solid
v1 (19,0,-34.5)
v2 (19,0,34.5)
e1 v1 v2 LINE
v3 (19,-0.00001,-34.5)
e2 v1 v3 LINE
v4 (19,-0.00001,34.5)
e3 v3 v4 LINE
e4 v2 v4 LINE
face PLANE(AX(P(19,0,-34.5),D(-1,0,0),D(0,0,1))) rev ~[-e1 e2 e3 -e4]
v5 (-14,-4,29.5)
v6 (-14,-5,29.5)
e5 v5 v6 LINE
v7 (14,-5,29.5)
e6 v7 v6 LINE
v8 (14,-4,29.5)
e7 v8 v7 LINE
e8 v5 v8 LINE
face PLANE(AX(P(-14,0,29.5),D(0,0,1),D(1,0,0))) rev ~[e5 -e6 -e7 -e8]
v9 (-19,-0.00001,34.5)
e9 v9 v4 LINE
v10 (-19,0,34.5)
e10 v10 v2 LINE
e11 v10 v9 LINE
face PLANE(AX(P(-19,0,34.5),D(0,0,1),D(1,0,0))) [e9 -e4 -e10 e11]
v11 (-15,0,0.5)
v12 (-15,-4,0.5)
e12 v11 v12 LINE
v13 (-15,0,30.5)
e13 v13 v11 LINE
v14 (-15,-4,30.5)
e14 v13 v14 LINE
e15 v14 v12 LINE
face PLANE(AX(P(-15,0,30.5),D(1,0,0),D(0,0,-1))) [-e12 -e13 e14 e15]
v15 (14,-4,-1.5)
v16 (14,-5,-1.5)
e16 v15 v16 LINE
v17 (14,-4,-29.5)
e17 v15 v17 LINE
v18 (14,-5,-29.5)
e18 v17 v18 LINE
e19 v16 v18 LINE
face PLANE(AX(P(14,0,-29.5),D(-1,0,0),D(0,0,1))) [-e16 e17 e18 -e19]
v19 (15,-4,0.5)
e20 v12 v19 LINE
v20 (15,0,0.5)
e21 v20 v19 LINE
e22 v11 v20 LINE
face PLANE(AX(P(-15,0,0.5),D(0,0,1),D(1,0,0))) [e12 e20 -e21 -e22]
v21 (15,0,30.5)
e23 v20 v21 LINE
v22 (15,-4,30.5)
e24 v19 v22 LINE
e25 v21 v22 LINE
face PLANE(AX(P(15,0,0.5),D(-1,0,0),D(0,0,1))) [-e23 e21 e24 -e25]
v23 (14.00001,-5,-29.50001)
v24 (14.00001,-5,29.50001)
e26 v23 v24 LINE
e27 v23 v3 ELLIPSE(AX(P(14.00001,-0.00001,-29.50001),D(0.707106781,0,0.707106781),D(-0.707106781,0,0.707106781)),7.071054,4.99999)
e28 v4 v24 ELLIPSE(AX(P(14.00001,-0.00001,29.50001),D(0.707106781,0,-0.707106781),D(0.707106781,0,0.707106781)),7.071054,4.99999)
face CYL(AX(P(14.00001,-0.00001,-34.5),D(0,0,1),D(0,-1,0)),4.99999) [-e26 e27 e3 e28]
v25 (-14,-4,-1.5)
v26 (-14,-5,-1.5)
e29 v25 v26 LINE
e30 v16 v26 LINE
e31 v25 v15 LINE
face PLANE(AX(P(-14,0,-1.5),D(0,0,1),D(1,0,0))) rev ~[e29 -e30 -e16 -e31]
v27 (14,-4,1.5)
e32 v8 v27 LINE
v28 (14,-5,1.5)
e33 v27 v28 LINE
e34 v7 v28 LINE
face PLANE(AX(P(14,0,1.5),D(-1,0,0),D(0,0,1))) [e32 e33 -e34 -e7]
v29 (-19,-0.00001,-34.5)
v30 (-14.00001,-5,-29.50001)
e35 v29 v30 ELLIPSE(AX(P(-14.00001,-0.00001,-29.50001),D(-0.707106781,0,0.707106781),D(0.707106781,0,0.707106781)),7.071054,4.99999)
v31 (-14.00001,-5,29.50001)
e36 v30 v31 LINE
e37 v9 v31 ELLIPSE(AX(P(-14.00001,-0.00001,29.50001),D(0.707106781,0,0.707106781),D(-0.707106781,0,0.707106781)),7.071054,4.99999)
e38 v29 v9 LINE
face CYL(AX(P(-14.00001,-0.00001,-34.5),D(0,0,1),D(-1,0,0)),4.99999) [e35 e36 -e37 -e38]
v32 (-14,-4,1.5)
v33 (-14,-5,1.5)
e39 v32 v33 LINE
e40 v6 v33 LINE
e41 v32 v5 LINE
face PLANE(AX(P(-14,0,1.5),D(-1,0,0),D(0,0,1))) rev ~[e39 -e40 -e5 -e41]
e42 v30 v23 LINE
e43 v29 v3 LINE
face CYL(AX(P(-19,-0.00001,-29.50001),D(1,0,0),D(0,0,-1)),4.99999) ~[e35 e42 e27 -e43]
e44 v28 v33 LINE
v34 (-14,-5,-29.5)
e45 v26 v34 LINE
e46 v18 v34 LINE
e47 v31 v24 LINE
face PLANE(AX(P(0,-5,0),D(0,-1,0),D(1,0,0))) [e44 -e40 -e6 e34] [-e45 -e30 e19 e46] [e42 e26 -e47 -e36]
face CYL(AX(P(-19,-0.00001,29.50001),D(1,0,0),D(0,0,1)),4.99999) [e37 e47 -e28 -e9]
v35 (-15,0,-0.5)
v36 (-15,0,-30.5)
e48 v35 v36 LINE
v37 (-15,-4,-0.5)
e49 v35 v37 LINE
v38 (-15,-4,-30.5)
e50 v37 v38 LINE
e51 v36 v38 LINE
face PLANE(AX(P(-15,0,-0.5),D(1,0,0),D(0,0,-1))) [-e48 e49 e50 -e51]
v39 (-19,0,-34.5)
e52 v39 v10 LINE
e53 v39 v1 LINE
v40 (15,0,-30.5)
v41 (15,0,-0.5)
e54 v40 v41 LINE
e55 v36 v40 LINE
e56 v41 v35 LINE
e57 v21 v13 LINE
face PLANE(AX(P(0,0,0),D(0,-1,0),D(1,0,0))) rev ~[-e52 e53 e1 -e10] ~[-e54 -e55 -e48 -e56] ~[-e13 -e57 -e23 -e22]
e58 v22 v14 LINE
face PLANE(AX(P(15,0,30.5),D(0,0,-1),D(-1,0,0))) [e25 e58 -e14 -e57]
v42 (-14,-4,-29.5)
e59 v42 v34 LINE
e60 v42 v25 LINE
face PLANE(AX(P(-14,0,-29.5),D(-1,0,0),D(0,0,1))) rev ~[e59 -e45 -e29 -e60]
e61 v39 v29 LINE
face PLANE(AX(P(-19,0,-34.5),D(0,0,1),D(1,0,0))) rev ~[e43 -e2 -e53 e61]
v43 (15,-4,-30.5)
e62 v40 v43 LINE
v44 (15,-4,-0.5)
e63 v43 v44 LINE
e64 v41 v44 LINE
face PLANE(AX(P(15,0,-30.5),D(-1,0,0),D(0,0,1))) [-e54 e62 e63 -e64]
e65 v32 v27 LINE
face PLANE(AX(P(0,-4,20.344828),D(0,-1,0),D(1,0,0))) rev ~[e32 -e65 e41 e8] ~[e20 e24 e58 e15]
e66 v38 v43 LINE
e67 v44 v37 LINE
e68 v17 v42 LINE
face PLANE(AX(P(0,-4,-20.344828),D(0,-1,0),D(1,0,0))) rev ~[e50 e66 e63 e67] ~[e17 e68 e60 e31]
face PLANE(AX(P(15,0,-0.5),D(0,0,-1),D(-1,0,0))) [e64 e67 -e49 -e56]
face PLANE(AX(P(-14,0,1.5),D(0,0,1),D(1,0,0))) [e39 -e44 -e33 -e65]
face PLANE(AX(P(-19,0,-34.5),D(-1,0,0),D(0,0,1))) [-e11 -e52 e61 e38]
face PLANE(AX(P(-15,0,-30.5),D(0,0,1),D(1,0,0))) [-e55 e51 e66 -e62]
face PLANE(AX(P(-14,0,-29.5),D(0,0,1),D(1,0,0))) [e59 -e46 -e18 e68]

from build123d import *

# Parameters (mm, degrees)
F0_W     = 38
F0_H     = 69
F0_W_2   = 28
F0_H_2   = 28
F0_H_3   = 1
F0_W_3   = 1
F1_DEPTH = 5
F2_DEPTH = 25
F3_DEPTH = 4
F4_R     = 4.99999


# Not quite as in the source:
# - a fillet or chamfer is up to 0.001 mm smaller than in the source, because OpenCascade refuses the exact size


with BuildPart() as f1:
    # F0 (on Front) → F1 (new body)
    with BuildSketch(Plane.XZ):
        Rectangle(F0_W, F0_H)
        Polygon((-15, 0.5), (-15, 1.5), (-15, 30.5), (15, 30.5), (15, 1.5), (15, 0.5), (15, -0.5), (15, -1.5), (15, -30.5), (-15, -30.5), (-15, -1.5), (-15, -0.5), align=None, mode=Mode.SUBTRACT)
        with Locations((0, 15.5)):
            Rectangle(F0_W_2, F0_H_2)
        with Locations((0, -15.5)):
            Rectangle(F0_W_2, F0_H_2)
        Polygon((-14, -29.5), (-14, -1.5), (-15, -1.5), (-15, -30.5), (15, -30.5), (15, -1.5), (14, -1.5), (14, -29.5), align=None)
        Polygon((-14, 1.5), (-14, 29.5), (14, 29.5), (14, 1.5), (15, 1.5), (15, 30.5), (-15, 30.5), (-15, 1.5), align=None)
        with Locations((0, 1)):
            Rectangle(F0_W_2, F0_H_3)
        with Locations((0, -1)):
            Rectangle(F0_W_2, F0_H_3)
        Rectangle(F0_W_2, F0_H_3)
        with Locations((-14.5, 1)):
            Rectangle(F0_W_3, F0_H_3)
        with Locations((-14.5, 0)):
            Rectangle(F0_W_3, F0_H_3)
        with Locations((-14.5, -1)):
            Rectangle(F0_W_3, F0_H_3)
        with Locations((14.5, 1)):
            Rectangle(F0_W_3, F0_H_3)
        with Locations((14.5, 0)):
            Rectangle(F0_W_3, F0_H_3)
        with Locations((14.5, -1)):
            Rectangle(F0_W_3, F0_H_3)
    extrude(amount=F1_DEPTH)

    # F0 (on Front) → F2 (cut)
    with BuildSketch(Plane.XZ):
        with Locations((0, 15.5)):
            Rectangle(F0_W_2, F0_H_2)
        with Locations((0, -15.5)):
            Rectangle(F0_W_2, F0_H_2)
    extrude(amount=F2_DEPTH, mode=Mode.SUBTRACT)

    # F0 (on Front) → F3 (cut)
    with BuildSketch(Plane.XZ):
        Polygon((-14, 1.5), (-14, 29.5), (14, 29.5), (14, 1.5), (15, 1.5), (15, 30.5), (-15, 30.5), (-15, 1.5), align=None)
        with Locations((14.5, 1)):
            Rectangle(F0_W_3, F0_H_3)
        with Locations((0, 1)):
            Rectangle(F0_W_2, F0_H_3)
        with Locations((-14.5, 1)):
            Rectangle(F0_W_3, F0_H_3)
        Polygon((-14, -29.5), (-14, -1.5), (-15, -1.5), (-15, -30.5), (15, -30.5), (15, -1.5), (14, -1.5), (14, -29.5), align=None)
        with Locations((14.5, -1)):
            Rectangle(F0_W_3, F0_H_3)
        with Locations((0, -1)):
            Rectangle(F0_W_2, F0_H_3)
        with Locations((-14.5, -1)):
            Rectangle(F0_W_3, F0_H_3)
    extrude(amount=F3_DEPTH, mode=Mode.SUBTRACT)

    # F4 (radius 5 in the source; OpenCascade refuses exactly that, so slightly less here)
    f4_edges = [f1.edges().sort_by_distance(p)[0] for p in [
        (-19, -5, 0),
        (0, -5, 34.5),
        (19, -5, 0),
        (0, -5, -34.5),
    ]]
    fillet(f4_edges, radius=F4_R)


solid = f1.part
